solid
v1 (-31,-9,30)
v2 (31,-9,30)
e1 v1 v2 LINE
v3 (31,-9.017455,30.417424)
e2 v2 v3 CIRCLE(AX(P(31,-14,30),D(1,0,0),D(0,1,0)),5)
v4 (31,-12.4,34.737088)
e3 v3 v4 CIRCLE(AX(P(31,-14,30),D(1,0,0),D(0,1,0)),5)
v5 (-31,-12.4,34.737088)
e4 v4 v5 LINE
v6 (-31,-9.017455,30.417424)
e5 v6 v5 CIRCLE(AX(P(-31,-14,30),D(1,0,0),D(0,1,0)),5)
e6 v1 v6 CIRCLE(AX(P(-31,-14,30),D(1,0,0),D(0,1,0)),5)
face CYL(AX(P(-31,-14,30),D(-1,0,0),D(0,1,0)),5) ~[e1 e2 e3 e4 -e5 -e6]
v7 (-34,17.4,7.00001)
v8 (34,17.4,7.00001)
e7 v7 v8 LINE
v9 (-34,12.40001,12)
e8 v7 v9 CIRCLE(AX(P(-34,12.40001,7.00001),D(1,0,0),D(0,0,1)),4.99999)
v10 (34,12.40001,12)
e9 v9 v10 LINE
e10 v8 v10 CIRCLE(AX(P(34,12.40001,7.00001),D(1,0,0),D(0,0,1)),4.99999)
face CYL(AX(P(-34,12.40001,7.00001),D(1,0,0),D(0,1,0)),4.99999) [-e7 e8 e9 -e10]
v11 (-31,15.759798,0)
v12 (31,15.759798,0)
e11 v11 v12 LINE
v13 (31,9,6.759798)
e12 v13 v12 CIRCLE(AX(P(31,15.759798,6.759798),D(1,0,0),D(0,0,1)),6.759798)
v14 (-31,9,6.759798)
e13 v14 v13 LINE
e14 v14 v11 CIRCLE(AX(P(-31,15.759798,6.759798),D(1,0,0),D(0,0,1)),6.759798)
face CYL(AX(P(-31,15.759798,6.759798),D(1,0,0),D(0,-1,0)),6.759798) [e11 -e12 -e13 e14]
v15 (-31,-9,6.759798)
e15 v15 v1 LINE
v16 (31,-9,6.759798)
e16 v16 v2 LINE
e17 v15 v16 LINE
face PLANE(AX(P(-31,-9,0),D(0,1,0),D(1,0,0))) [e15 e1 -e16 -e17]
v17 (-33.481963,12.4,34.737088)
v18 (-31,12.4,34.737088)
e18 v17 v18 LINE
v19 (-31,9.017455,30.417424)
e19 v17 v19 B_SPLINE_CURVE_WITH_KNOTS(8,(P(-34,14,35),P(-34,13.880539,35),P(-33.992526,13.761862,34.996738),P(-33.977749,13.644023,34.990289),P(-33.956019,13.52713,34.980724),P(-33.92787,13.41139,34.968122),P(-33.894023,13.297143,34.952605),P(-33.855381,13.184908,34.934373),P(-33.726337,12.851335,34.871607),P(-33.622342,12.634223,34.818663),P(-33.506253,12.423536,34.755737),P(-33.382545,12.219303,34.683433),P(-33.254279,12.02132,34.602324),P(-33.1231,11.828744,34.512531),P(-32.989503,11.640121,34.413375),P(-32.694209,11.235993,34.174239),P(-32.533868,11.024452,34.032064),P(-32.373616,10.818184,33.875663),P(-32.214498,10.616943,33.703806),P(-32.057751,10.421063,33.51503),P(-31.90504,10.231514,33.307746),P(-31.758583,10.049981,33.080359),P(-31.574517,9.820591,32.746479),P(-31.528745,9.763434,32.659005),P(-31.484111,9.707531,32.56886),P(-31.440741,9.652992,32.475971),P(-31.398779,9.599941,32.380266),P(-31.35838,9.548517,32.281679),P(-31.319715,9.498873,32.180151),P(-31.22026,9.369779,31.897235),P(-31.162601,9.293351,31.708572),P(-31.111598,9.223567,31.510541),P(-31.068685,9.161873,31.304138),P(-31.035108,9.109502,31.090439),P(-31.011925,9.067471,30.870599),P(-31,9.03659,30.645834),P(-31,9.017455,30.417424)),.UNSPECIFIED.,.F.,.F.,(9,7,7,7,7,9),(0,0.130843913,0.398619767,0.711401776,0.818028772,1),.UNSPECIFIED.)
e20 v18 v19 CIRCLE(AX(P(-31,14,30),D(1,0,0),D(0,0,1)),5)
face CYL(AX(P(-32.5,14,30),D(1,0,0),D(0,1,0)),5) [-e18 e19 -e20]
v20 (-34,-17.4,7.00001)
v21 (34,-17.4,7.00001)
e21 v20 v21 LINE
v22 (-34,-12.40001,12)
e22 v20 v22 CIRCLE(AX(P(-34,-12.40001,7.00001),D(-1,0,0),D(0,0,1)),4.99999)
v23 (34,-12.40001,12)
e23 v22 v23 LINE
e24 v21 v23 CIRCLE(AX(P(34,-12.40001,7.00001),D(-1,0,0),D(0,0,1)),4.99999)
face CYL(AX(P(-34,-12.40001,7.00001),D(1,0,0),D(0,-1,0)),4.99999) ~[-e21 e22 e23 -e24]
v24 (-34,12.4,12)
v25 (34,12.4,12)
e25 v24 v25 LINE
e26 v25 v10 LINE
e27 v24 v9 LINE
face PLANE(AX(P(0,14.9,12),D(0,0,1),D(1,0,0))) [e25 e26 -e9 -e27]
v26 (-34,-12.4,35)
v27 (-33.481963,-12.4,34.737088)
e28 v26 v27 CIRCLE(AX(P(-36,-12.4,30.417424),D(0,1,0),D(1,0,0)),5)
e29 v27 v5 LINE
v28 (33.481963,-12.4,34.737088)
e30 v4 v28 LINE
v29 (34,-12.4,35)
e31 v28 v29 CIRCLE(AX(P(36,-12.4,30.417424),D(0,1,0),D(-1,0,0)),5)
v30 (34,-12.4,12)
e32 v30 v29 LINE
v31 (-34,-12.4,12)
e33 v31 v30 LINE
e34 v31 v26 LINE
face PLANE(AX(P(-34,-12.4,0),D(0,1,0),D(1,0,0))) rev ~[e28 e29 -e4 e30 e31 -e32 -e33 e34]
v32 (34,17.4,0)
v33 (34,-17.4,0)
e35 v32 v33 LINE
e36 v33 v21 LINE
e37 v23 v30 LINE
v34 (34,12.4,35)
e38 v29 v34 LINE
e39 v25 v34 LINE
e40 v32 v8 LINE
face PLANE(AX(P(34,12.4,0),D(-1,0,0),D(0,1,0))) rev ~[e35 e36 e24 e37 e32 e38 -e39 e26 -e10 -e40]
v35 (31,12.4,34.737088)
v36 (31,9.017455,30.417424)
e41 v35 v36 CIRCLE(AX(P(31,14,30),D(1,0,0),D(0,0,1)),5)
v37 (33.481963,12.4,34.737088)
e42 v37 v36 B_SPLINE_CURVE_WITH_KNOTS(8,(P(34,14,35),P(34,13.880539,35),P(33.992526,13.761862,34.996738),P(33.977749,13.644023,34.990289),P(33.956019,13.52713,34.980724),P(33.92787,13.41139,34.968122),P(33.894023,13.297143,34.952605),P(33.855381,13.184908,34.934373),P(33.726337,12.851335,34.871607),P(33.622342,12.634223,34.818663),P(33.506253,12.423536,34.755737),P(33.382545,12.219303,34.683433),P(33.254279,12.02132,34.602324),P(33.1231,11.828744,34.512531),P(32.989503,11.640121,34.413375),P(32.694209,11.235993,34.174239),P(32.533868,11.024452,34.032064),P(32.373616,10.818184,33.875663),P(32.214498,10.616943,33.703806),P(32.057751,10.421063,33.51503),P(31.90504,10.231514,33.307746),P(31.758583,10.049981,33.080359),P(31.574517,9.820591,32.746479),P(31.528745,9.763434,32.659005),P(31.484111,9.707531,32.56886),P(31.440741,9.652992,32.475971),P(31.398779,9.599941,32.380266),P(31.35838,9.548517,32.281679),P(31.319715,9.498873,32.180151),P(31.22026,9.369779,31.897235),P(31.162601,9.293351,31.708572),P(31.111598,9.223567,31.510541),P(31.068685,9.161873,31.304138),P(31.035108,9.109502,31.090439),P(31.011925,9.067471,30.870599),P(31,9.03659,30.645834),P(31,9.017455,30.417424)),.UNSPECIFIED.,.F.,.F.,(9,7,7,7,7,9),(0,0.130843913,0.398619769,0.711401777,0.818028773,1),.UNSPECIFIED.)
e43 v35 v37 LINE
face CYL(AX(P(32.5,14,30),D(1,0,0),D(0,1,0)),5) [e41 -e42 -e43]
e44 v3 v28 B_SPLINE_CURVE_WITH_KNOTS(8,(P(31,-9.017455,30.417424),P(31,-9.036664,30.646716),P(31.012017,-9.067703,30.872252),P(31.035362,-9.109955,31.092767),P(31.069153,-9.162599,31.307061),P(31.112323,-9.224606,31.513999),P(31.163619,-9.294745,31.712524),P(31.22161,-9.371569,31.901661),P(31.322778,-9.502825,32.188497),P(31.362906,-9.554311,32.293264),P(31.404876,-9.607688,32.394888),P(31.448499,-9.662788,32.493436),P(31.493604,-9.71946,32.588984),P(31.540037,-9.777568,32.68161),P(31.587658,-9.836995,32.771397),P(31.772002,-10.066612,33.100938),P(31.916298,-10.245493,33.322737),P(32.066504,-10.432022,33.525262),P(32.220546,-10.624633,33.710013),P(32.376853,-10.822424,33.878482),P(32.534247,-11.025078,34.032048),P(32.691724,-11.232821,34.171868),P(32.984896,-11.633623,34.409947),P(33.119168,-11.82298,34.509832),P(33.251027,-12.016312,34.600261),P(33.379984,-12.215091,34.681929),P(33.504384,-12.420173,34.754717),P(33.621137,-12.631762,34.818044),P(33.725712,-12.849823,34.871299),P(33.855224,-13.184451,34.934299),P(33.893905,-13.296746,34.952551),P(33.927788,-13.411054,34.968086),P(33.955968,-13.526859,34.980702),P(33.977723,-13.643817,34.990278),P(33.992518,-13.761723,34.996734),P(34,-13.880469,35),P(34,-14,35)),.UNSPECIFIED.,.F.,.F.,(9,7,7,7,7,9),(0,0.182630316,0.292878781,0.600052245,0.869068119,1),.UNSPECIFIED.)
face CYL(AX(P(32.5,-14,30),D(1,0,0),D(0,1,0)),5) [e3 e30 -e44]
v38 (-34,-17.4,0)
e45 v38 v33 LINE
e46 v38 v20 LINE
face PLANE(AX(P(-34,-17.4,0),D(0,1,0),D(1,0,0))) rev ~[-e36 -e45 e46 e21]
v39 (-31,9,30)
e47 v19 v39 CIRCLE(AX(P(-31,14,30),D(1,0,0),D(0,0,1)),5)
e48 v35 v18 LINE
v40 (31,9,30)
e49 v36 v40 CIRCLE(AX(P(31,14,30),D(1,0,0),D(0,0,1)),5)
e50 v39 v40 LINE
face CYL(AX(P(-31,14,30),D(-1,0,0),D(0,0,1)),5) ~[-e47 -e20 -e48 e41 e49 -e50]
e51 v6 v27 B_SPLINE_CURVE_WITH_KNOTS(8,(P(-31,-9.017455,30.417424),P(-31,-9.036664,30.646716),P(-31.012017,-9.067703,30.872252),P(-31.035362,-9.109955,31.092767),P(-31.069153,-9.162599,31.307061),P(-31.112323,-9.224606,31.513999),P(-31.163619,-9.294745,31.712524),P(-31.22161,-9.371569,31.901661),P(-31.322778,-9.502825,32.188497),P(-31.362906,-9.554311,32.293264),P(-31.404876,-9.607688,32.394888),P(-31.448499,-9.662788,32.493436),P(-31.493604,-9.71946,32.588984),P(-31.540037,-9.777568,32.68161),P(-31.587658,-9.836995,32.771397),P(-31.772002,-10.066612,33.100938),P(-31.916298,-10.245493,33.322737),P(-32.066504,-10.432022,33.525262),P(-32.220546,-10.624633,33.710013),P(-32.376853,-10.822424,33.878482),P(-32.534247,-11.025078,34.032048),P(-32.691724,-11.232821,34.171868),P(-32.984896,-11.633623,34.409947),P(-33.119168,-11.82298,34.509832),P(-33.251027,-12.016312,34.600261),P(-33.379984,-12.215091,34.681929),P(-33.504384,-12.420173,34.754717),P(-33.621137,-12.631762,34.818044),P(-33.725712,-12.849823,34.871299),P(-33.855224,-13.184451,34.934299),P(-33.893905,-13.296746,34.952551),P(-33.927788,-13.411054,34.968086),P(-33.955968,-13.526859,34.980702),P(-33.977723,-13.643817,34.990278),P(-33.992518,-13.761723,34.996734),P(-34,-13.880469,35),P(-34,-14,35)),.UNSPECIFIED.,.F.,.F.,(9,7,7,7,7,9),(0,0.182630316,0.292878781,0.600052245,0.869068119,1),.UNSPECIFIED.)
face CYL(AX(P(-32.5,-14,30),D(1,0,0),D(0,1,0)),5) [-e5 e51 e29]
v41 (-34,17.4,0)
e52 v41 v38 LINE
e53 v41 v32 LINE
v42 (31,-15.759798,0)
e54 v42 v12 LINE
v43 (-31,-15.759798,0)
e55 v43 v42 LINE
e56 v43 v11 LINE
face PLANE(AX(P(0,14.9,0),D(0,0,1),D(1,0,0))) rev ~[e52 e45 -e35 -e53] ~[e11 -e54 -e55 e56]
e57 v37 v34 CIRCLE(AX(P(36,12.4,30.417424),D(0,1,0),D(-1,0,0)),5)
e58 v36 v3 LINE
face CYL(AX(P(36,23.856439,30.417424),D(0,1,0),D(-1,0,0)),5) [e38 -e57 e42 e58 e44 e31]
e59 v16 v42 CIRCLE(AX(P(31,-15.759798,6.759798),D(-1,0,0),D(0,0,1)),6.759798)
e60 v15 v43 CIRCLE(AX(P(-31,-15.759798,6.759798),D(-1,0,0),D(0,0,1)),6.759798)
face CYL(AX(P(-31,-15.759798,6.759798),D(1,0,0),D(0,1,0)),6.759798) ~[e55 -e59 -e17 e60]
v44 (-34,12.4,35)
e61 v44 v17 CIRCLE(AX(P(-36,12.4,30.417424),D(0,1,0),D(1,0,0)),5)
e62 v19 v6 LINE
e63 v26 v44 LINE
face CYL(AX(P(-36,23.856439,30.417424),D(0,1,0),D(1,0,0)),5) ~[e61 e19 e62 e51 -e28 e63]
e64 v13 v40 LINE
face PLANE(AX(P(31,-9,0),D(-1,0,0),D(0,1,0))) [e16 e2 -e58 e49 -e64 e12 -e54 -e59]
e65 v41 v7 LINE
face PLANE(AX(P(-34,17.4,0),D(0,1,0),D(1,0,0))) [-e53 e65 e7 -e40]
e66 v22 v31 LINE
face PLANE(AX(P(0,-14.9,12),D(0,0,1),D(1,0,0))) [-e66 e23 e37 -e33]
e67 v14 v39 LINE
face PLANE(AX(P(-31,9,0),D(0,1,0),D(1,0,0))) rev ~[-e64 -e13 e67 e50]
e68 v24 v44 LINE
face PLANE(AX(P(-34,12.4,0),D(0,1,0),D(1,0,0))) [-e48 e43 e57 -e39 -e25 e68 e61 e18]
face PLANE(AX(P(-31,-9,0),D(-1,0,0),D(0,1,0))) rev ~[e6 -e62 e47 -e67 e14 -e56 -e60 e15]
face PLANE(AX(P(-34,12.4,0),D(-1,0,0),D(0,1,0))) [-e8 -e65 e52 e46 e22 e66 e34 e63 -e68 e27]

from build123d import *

# Parameters (mm, degrees)
F0_W         = 68
F0_H         = 24.8
F0_W_2       = 62
F0_H_2       = 18
F1_DEPTH     = 35
F0_H_3       = 5
F2_DEPTH     = 12
F3_R         = 6.7597979746
F4_R         = 6.7597979746
F5_R         = 4.99999
F6_R         = 4.99999
F7_T1_DEPTH  = 62
F8_T1_DEPTH  = 62
F9_T4_DEPTH  = 47.7128784748
F9_S5_R      = 5.0000000001
F9_T6_DEPTH  = 26
F9_S7_R      = 5.0000000001
F9_T8_DEPTH  = 26
F10_T4_DEPTH = 47.7128784748
F10_S5_R     = 5.0000000001
F10_T6_DEPTH = 26
F10_S7_R     = 5.0000000001
F10_T8_DEPTH = 26


# Not quite as in the source:
# - a fillet or chamfer that OpenCascade refuses, or shapes differently, is made with other operations: its cross-section is extruded or revolved along the edge and cut away or added
# - a fillet or chamfer is up to 0.001 mm smaller than in the source, because OpenCascade refuses the exact size


with BuildPart() as f1:
    # F0 (on Top) → F1 (new body)
    with BuildSketch(Plane.XY):
        Rectangle(F0_W, F0_H)
        Rectangle(F0_W_2, F0_H_2, mode=Mode.SUBTRACT)
    extrude(amount=F1_DEPTH)

    # F0 (on Top) → F2 (join)
    with BuildSketch(Plane.XY):
        with Locations((0, 14.9)):
            Rectangle(F0_W, F0_H_3)
        with Locations((0, -14.9)):
            Rectangle(F0_W, F0_H_3)
    extrude(amount=F2_DEPTH)

    # F3
    f3_edges = [f1.edges().sort_by_distance(p)[0] for p in [
        (0, 9, 0),
    ]]
    fillet(f3_edges, radius=F3_R)

    # F4
    f4_edges = [f1.edges().sort_by_distance(p)[0] for p in [
        (0, -9, 0),
    ]]
    fillet(f4_edges, radius=F4_R)

    # F5 (radius 5 in the source; OpenCascade refuses exactly that, so slightly less here)
    f5_edges = [f1.edges().sort_by_distance(p)[0] for p in [
        (0, 17.4, 12),
    ]]
    fillet(f5_edges, radius=F5_R)

    # F6 (radius 5 in the source; OpenCascade refuses exactly that, so slightly less here)
    f6_edges = [f1.edges().sort_by_distance(p)[0] for p in [
        (0, -17.4, 12),
    ]]
    fillet(f6_edges, radius=F6_R)

    # F7: fillet of radius 5 on 1 edges, made by hand

    # F7_s2 → F7_t1 (cut)
    with BuildSketch(Plane.YZ.offset(-31)):
        with BuildLine():
            ThreePointArc((14, 35), (10.4644660941, 33.5355339059), (9, 30))
            Line((9, 30), (9, 35))
            Line((9, 35), (14, 35))
        make_face()
    extrude(amount=F7_T1_DEPTH, mode=Mode.SUBTRACT)

    # F8: fillet of radius 5 on 1 edges, made by hand

    # F8_s2 → F8_t1 (cut)
    with BuildSketch(Plane.YZ.offset(-31)):
        with BuildLine():
            ThreePointArc((-9, 30), (-10.4644660941, 33.5355339059), (-14, 35))
            Line((-14, 35), (-9, 35))
            Line((-9, 35), (-9, 30))
        make_face()
    extrude(amount=F8_T1_DEPTH, mode=Mode.SUBTRACT)

    # F9: fillet of radius 5 on 1 edges, made by hand


with BuildPart() as f9_tool2:
    # F9_s3 → F9_t4 (new body)
    with BuildSketch(Plane.XZ.offset(-23.8564392374)):
        with BuildLine():
            ThreePointArc((-31, 30.417424305), (-31.8166998673, 33.1560370926), (-34, 35))
            Line((-34, 35), (-31, 35))
            Line((-31, 35), (-31, 30.417424305))
        make_face()
    extrude(amount=F9_T4_DEPTH)

    # F9_s5 → F9_t6 (cut, symmetric)
    with BuildSketch(Plane.YZ.offset(-32.5)):
        with Locations((-14.0000000001, 29.9999999999)):
            Circle(F9_S5_R)
    extrude(amount=F9_T6_DEPTH, both=True, mode=Mode.SUBTRACT)

    # F9_s7 → F9_t8 (cut, symmetric)
    with BuildSketch(Plane.YZ.offset(-32.5)):
        with Locations((14.0000000001, 29.9999999999)):
            Circle(F9_S7_R)
    extrude(amount=F9_T8_DEPTH, both=True, mode=Mode.SUBTRACT)


with BuildPart() as f1_1:
    add(f1.part)

    # F9_t1: cut F9_tool2
    add(f9_tool2.part, mode=Mode.SUBTRACT)

    # F10: fillet of radius 5 on 1 edges, made by hand


with BuildPart() as f10_tool2:
    # F10_s3 → F10_t4 (new body)
    with BuildSketch(Plane.XZ.offset(-23.8564392374)):
        with BuildLine():
            ThreePointArc((31, 30.417424305), (31.8166998673, 33.1560370926), (34, 35))
            Line((34, 35), (31, 35))
            Line((31, 35), (31, 30.417424305))
        make_face()
    extrude(amount=F10_T4_DEPTH)

    # F10_s5 → F10_t6 (cut, symmetric)
    with BuildSketch(Plane.YZ.offset(32.5)):
        with Locations((-14.0000000001, 29.9999999999)):
            Circle(F10_S5_R)
    extrude(amount=F10_T6_DEPTH, both=True, mode=Mode.SUBTRACT)

    # F10_s7 → F10_t8 (cut, symmetric)
    with BuildSketch(Plane.YZ.offset(32.5)):
        with Locations((14.0000000001, 29.9999999999)):
            Circle(F10_S7_R)
    extrude(amount=F10_T8_DEPTH, both=True, mode=Mode.SUBTRACT)


with BuildPart() as f1_2:
    add(f1_1.part)

    # F10_t1: cut F10_tool2
    add(f10_tool2.part, mode=Mode.SUBTRACT)


solid = f1_2.part
